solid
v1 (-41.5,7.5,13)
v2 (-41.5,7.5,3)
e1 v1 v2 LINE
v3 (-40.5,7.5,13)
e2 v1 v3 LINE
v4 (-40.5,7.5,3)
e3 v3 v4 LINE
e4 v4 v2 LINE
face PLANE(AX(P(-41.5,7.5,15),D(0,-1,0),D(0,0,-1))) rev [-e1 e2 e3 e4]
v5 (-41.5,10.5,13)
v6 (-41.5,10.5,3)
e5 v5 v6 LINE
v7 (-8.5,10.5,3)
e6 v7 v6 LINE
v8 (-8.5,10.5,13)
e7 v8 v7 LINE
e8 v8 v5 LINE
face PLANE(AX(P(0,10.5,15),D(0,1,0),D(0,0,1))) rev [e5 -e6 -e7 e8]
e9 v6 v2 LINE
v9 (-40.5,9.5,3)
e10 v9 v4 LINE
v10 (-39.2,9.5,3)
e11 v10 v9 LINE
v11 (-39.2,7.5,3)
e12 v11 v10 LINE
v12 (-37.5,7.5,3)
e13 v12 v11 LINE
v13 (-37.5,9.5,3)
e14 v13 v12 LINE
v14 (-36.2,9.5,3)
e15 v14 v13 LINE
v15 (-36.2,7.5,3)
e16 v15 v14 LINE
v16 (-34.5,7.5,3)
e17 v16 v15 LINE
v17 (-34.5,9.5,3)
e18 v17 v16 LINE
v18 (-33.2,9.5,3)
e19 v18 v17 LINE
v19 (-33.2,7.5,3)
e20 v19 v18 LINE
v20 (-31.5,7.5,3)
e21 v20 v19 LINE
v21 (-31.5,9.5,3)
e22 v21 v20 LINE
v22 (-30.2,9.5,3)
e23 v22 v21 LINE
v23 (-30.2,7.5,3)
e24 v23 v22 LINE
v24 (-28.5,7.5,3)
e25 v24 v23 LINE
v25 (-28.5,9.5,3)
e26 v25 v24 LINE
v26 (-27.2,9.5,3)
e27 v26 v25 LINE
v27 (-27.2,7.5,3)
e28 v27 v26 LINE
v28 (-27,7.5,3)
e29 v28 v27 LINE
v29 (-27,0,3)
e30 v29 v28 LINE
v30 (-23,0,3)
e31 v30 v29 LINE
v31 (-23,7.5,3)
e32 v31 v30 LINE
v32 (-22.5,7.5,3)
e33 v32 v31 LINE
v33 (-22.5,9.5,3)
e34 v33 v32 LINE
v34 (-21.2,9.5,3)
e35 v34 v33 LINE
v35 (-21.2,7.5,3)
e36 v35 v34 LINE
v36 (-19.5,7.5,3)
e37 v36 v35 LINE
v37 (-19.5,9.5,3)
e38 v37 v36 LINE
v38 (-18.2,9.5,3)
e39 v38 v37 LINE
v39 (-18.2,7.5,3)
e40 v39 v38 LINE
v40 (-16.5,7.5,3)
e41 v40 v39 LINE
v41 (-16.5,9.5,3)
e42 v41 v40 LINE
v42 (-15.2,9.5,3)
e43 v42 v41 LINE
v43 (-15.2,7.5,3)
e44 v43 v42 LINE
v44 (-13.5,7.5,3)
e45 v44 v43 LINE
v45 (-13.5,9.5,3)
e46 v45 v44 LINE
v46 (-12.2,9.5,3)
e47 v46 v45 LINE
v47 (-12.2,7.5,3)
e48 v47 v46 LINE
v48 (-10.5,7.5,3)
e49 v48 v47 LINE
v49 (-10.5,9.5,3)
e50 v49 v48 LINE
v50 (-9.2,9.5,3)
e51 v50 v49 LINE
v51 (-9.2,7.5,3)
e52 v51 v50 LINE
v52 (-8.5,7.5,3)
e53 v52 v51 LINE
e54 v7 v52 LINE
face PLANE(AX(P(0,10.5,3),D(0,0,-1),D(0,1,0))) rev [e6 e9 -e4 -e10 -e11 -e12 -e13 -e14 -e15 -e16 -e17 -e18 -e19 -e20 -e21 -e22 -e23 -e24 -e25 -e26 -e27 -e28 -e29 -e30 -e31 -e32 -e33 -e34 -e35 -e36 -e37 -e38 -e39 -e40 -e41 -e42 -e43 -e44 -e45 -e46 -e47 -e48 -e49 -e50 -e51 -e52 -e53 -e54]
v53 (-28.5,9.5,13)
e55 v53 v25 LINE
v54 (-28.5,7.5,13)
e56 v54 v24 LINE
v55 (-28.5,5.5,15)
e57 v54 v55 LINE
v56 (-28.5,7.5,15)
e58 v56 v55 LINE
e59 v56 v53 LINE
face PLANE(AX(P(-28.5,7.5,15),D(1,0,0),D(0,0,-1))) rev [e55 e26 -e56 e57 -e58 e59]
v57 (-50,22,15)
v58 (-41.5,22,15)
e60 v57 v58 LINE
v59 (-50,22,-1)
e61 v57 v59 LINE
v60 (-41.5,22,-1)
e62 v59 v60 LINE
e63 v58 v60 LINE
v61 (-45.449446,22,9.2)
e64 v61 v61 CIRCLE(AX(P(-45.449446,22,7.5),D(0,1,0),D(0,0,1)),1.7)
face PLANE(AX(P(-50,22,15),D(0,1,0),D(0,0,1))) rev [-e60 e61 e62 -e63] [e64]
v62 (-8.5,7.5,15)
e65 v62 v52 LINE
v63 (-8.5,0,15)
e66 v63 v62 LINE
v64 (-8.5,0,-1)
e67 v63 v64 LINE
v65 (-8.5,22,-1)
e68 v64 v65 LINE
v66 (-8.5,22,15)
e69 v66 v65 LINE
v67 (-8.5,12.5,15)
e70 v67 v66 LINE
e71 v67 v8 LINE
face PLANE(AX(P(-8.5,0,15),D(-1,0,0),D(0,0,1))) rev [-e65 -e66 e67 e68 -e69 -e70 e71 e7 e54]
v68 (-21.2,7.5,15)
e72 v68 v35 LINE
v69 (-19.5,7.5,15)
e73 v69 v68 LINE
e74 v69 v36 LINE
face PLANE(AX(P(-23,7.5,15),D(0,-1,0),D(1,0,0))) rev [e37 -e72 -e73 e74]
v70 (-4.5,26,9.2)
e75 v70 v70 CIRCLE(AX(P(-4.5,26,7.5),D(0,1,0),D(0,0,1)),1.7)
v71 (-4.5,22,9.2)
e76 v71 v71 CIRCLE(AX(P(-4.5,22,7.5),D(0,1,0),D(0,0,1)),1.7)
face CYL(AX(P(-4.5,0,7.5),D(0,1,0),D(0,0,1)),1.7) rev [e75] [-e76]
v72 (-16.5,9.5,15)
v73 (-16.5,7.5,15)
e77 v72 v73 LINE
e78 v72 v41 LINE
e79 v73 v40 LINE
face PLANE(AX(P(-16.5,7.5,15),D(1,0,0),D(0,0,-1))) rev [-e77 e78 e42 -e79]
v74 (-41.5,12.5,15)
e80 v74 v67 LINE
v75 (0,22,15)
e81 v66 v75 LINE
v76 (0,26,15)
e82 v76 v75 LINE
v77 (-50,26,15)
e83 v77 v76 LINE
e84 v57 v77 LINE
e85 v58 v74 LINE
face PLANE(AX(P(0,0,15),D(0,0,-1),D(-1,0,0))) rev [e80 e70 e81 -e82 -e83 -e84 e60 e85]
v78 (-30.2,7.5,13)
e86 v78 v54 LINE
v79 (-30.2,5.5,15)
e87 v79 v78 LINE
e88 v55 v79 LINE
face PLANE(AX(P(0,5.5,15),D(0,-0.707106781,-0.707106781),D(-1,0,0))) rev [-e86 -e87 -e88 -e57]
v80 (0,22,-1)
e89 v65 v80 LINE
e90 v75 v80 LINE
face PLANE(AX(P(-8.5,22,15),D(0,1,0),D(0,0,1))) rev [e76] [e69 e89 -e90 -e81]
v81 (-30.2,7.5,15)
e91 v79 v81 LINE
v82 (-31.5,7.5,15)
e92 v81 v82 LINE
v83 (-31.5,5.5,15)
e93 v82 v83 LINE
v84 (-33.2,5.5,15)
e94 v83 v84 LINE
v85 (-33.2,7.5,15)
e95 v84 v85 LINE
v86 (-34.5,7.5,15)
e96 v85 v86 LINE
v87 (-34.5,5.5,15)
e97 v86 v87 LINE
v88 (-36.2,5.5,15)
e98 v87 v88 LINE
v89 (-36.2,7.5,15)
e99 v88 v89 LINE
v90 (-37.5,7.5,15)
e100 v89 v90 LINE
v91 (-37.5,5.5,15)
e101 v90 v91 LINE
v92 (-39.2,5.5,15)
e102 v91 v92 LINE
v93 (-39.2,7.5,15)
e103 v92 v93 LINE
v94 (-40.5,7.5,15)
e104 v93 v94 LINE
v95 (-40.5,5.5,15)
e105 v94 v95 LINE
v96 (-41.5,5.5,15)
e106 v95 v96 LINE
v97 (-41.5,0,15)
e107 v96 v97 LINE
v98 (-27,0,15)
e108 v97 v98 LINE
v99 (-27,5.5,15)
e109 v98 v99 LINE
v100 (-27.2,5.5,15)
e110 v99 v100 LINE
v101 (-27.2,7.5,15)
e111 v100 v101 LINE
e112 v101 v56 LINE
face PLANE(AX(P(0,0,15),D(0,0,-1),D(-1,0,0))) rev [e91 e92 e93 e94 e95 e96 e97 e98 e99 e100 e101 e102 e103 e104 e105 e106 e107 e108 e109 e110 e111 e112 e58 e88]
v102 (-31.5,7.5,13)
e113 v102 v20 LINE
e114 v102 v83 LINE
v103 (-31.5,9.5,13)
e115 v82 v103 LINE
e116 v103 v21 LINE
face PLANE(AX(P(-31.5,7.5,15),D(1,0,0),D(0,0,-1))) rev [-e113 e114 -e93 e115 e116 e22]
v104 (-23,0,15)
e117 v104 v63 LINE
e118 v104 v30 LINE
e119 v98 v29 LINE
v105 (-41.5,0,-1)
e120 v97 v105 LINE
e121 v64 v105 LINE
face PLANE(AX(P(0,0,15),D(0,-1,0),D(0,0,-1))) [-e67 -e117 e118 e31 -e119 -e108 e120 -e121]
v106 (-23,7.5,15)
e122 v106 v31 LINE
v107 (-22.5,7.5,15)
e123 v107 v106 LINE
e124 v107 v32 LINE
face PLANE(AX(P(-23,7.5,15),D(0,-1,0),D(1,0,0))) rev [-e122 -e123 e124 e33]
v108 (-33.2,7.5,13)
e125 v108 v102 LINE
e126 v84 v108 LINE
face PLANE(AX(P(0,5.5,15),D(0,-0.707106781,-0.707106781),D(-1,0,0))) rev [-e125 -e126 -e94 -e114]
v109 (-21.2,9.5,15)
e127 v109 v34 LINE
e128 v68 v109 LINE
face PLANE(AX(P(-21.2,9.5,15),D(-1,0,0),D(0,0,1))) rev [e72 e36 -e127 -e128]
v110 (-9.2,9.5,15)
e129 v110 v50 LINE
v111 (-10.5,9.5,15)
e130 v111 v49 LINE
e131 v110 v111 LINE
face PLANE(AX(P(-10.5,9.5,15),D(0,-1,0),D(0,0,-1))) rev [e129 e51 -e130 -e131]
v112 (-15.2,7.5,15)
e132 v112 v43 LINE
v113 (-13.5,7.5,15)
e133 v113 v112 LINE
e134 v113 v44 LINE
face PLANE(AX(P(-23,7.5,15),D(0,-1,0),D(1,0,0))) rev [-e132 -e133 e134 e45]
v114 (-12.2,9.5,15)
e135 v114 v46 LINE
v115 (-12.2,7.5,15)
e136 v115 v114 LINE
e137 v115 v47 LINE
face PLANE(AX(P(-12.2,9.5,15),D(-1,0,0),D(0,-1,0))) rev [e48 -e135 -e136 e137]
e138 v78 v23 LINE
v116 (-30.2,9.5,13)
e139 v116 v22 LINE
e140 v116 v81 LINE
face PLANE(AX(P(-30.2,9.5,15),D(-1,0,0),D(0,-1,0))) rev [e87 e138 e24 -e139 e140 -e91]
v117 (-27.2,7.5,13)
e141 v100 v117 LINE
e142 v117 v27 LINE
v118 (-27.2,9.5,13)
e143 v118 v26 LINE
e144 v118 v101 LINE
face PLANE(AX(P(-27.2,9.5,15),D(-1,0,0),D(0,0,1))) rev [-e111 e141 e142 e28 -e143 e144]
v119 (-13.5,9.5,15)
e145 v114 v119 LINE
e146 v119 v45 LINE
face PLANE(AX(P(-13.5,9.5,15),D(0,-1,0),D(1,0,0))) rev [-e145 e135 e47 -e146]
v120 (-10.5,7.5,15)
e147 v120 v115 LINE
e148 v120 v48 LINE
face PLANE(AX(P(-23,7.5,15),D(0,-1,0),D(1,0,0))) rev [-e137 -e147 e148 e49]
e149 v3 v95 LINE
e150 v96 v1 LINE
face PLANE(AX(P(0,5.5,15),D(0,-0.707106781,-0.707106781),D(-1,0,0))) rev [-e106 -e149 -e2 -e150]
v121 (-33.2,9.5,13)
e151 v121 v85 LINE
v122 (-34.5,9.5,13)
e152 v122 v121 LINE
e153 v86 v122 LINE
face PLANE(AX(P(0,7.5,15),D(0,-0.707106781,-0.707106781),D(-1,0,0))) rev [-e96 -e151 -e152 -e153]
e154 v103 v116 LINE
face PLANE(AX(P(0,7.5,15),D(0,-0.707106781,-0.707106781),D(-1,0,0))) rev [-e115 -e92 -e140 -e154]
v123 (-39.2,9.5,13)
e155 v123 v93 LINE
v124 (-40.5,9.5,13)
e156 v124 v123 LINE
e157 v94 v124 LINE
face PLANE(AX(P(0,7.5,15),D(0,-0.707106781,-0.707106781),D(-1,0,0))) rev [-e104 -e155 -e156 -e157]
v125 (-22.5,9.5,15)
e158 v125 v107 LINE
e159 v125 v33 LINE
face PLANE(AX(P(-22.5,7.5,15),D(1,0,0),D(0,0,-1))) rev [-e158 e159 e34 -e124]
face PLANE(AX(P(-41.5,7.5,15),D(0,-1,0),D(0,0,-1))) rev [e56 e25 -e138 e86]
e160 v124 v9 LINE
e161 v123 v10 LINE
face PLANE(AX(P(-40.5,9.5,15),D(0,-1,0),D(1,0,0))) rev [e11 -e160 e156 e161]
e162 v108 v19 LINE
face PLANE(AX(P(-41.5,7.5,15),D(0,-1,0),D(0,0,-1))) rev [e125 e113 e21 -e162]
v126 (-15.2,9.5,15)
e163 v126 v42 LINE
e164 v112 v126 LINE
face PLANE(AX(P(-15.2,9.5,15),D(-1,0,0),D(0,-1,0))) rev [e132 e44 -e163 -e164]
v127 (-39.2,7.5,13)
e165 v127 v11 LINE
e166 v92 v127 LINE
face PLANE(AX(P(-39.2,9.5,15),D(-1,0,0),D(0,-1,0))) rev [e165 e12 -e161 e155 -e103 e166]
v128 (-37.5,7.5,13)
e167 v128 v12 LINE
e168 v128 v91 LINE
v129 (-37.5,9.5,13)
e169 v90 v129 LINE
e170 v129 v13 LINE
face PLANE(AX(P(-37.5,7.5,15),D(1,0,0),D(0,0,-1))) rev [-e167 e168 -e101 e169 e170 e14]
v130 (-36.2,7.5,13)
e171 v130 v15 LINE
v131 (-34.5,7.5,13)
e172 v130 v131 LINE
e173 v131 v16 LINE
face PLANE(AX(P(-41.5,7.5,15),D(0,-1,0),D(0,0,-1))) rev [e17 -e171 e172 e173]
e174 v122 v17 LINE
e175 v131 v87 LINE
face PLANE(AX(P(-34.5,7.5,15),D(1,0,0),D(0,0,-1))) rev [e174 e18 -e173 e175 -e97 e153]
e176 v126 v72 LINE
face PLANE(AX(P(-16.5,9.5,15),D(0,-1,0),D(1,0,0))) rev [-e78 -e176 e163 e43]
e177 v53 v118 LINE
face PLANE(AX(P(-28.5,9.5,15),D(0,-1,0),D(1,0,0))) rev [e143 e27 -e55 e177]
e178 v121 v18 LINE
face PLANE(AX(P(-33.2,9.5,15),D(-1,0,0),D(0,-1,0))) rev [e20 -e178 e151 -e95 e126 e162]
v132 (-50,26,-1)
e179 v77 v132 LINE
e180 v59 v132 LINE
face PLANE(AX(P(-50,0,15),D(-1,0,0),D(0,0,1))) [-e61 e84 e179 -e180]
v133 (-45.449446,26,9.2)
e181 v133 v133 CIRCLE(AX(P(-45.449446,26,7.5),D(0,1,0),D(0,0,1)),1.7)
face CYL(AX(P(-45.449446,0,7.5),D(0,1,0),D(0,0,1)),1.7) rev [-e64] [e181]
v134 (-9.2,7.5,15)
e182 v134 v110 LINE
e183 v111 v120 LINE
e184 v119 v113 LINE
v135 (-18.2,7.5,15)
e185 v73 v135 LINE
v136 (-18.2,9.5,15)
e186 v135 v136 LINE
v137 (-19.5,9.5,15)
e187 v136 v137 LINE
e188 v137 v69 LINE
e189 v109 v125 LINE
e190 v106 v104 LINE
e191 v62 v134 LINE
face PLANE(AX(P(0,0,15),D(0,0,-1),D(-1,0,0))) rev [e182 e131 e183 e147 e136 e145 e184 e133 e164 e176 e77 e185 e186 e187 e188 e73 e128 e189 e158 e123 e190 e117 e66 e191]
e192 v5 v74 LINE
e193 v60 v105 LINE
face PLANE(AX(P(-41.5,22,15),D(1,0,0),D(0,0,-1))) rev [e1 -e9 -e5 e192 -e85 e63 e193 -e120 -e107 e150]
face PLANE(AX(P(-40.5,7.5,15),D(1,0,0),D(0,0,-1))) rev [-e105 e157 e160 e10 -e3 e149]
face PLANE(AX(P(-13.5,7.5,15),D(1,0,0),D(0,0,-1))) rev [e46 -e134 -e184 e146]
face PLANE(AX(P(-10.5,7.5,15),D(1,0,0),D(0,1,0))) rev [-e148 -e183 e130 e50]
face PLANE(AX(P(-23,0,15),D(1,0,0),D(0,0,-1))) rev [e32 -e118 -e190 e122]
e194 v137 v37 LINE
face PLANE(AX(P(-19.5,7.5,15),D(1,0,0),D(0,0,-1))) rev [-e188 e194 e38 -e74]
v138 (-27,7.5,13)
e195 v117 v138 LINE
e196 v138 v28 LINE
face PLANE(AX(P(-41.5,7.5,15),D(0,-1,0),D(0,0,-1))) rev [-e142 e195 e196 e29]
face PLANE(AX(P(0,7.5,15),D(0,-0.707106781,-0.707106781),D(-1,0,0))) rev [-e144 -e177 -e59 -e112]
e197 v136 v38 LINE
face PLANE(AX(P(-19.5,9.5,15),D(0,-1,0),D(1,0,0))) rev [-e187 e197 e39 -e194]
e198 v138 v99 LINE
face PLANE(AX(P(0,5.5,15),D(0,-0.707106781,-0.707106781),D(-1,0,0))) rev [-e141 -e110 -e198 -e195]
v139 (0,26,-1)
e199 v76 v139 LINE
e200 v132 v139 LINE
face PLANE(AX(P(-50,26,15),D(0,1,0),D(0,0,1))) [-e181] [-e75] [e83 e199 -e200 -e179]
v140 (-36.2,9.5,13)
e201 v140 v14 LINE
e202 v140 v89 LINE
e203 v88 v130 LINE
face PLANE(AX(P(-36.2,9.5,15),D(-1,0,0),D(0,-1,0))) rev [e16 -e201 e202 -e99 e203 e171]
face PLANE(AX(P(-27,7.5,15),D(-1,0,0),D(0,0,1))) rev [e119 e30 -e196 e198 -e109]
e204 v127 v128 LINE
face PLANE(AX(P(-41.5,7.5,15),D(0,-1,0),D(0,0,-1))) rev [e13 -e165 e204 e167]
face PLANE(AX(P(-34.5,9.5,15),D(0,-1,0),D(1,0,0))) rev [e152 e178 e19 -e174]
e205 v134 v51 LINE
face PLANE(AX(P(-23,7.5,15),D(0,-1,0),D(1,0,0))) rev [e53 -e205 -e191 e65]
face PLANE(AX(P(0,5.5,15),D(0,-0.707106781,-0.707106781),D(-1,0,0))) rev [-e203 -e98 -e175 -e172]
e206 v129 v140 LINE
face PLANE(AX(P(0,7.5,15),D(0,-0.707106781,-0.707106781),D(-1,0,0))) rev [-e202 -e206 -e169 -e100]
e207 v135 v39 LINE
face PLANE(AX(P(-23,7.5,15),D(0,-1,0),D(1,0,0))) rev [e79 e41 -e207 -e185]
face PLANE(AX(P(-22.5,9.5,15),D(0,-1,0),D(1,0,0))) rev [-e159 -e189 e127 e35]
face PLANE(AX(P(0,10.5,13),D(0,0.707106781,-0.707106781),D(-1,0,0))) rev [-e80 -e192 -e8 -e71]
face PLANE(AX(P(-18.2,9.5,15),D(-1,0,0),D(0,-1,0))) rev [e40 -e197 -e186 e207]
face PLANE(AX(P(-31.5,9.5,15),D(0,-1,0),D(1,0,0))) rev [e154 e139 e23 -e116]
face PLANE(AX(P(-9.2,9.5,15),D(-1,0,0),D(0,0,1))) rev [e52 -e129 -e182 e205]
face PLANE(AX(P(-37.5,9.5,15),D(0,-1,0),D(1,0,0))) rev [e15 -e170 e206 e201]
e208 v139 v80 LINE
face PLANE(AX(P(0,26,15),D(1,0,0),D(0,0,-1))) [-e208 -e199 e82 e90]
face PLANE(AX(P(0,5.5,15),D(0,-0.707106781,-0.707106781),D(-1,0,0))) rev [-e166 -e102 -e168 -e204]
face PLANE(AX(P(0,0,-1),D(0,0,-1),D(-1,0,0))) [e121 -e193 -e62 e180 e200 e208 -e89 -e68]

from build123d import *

# Parameters (mm, degrees)
SKETCH1_W            = 50
SKETCH1_H            = 26
BOSS_EXTRUDE1_DEPTH  = 16
SKETCH2_W            = 8.5
SKETCH2_H            = 22
CUT_EXTRUDE1_DEPTH   = 59.583274064
SKETCH3_W            = 8.5
SKETCH3_H            = 22
CUT_EXTRUDE2_DEPTH   = 59.583274064
SKETCH4_W            = 12
SKETCH4_H            = 10.5
CUT_EXTRUDE3_DEPTH   = 52.217672731
SKETCH5_W            = 14.5
SKETCH5_H            = 7.5
BOSS_EXTRUDE2_DEPTH  = 12
SKETCH6_W            = 1.3
SKETCH6_H            = 2
BOSS_EXTRUDE3_DEPTH  = 12
SKETCH7_W            = 1.3
SKETCH7_H            = 2
BOSS_EXTRUDE4_DEPTH  = 12
SKETCH8_W            = 1.3
SKETCH8_H            = 2
BOSS_EXTRUDE5_DEPTH  = 12
SKETCH9_W            = 1.3
SKETCH9_H            = 2
BOSS_EXTRUDE6_DEPTH  = 12
SKETCH10_W           = 1.3
SKETCH10_H           = 2
BOSS_EXTRUDE7_DEPTH  = 12
SKETCH11_W           = 14.5
SKETCH11_H           = 7.5
BOSS_EXTRUDE8_DEPTH  = 12
SKETCH12_W           = 1.3
SKETCH12_H           = 2
BOSS_EXTRUDE9_DEPTH  = 12
SKETCH13_W           = 1.3
SKETCH13_H           = 2
BOSS_EXTRUDE10_DEPTH = 12
SKETCH14_W           = 1.3
SKETCH14_H           = 2
BOSS_EXTRUDE11_DEPTH = 12
SKETCH15_W           = 1.3
SKETCH15_H           = 2
BOSS_EXTRUDE12_DEPTH = 12
SKETCH16_W           = 1.3
SKETCH16_H           = 2
BOSS_EXTRUDE13_DEPTH = 12
SKETCH17_R           = 1.7
CUT_EXTRUDE4_DEPTH   = 59.318093247
SKETCH18_R           = 1.7
CUT_EXTRUDE5_DEPTH   = 59.318093247
CHAMFER2_SIZE        = 2


with BuildPart() as part:
    # Sketch1 → Boss-Extrude1 (new body)
    with BuildSketch(Plane(origin=(0, 0, -1), x_dir=(-1, 0, 0), z_dir=(0, 0, -1))):
        with Locations((25, 13)):
            Rectangle(SKETCH1_W, SKETCH1_H)
    extrude(amount=-BOSS_EXTRUDE1_DEPTH)

    # Sketch2 → Cut-Extrude1 (cut, through all)
    with BuildSketch(Plane(origin=(0, 0, -1), x_dir=(-1, 0, 0), z_dir=(0, 0, -1))):
        with Locations((45.75, 11)):
            Rectangle(SKETCH2_W, SKETCH2_H)
    extrude(amount=-CUT_EXTRUDE1_DEPTH, mode=Mode.SUBTRACT)

    # Sketch3 → Cut-Extrude2 (cut, through all)
    with BuildSketch(Plane(origin=(0, 0, -1), x_dir=(-1, 0, 0), z_dir=(0, 0, -1))):
        with Locations((4.25, 11)):
            Rectangle(SKETCH3_W, SKETCH3_H)
    extrude(amount=-CUT_EXTRUDE2_DEPTH, mode=Mode.SUBTRACT)

    # Sketch4 → Cut-Extrude3 (cut, through all)
    with BuildSketch(Plane.ZY.offset(41.5)):
        with Locations((9, 5.25)):
            Rectangle(SKETCH4_W, SKETCH4_H)
    extrude(amount=-CUT_EXTRUDE3_DEPTH, mode=Mode.SUBTRACT)

    # Sketch5 → Boss-Extrude2 (add)
    with BuildSketch(Plane.XY.offset(3)):
        with Locations((-15.75, 3.75)):
            Rectangle(SKETCH5_W, SKETCH5_H)
    extrude(amount=BOSS_EXTRUDE2_DEPTH)

    # Sketch6 → Boss-Extrude3 (add)
    with BuildSketch(Plane.XY.offset(3)):
        with Locations((-9.85, 8.5)):
            Rectangle(SKETCH6_W, SKETCH6_H)
    extrude(amount=BOSS_EXTRUDE3_DEPTH)

    # Sketch7 → Boss-Extrude4 (add)
    with BuildSketch(Plane.XY.offset(3)):
        with Locations((-12.85, 8.5)):
            Rectangle(SKETCH7_W, SKETCH7_H)
    extrude(amount=BOSS_EXTRUDE4_DEPTH)

    # Sketch8 → Boss-Extrude5 (add)
    with BuildSketch(Plane.XY.offset(3)):
        with Locations((-15.85, 8.5)):
            Rectangle(SKETCH8_W, SKETCH8_H)
    extrude(amount=BOSS_EXTRUDE5_DEPTH)

    # Sketch9 → Boss-Extrude6 (add)
    with BuildSketch(Plane.XY.offset(3)):
        with Locations((-18.85, 8.5)):
            Rectangle(SKETCH9_W, SKETCH9_H)
    extrude(amount=BOSS_EXTRUDE6_DEPTH)

    # Sketch10 → Boss-Extrude7 (add)
    with BuildSketch(Plane.XY.offset(3)):
        with Locations((-21.85, 8.5)):
            Rectangle(SKETCH10_W, SKETCH10_H)
    extrude(amount=BOSS_EXTRUDE7_DEPTH)

    # Sketch11 → Boss-Extrude8 (add)
    with BuildSketch(Plane.XY.offset(3)):
        with Locations((-34.25, 3.75)):
            Rectangle(SKETCH11_W, SKETCH11_H)
    extrude(amount=BOSS_EXTRUDE8_DEPTH)

    # Sketch12 → Boss-Extrude9 (add)
    with BuildSketch(Plane.XY.offset(3)):
        with Locations((-27.85, 8.5)):
            Rectangle(SKETCH12_W, SKETCH12_H)
    extrude(amount=BOSS_EXTRUDE9_DEPTH)

    # Sketch13 → Boss-Extrude10 (add)
    with BuildSketch(Plane.XY.offset(3)):
        with Locations((-30.85, 8.5)):
            Rectangle(SKETCH13_W, SKETCH13_H)
    extrude(amount=BOSS_EXTRUDE10_DEPTH)

    # Sketch14 → Boss-Extrude11 (add)
    with BuildSketch(Plane.XY.offset(3)):
        with Locations((-33.85, 8.5)):
            Rectangle(SKETCH14_W, SKETCH14_H)
    extrude(amount=BOSS_EXTRUDE11_DEPTH)

    # Sketch15 → Boss-Extrude12 (add)
    with BuildSketch(Plane.XY.offset(3)):
        with Locations((-36.85, 8.5)):
            Rectangle(SKETCH15_W, SKETCH15_H)
    extrude(amount=BOSS_EXTRUDE12_DEPTH)

    # Sketch16 → Boss-Extrude13 (add)
    with BuildSketch(Plane.XY.offset(3)):
        with Locations((-39.85, 8.5)):
            Rectangle(SKETCH16_W, SKETCH16_H)
    extrude(amount=BOSS_EXTRUDE13_DEPTH)

    # Sketch17 → Cut-Extrude4 (cut, through all)
    with BuildSketch(Plane(origin=(0, 26, 0), x_dir=(-1, 0, 0), z_dir=(0, 1, 0))):
        with Locations(Location((4.5, 7.5, 0), (0, 0, 90))):
            Circle(SKETCH17_R)
    extrude(amount=-CUT_EXTRUDE4_DEPTH, mode=Mode.SUBTRACT)

    # Sketch18 → Cut-Extrude5 (cut, through all)
    with BuildSketch(Plane(origin=(0, 26, 0), x_dir=(-1, 0, 0), z_dir=(0, 1, 0))):
        with Locations(Location((45.449445698, 7.5, 0), (0, 0, 90))):
            Circle(SKETCH18_R)
    extrude(amount=-CUT_EXTRUDE5_DEPTH, mode=Mode.SUBTRACT)

    # Chamfer2
    chamfer2_edges = [part.edges().sort_by_distance(p)[0] for p in [
        (-39.85, 9.5, 15),
        (-38.35, 7.5, 15),
        (-36.85, 9.5, 15),
        (-35.35, 7.5, 15),
        (-33.85, 9.5, 15),
        (-32.35, 7.5, 15),
        (-30.85, 9.5, 15),
        (-29.35, 7.5, 15),
        (-27.85, 9.5, 15),
        (-27.1, 7.5, 15),
        (-41, 7.5, 15),
        (-25, 10.5, 15),
    ]]
    chamfer(chamfer2_edges, length=CHAMFER2_SIZE - 0.0001)  # a hair under: the kernel refuses the full size


solid = part.part
